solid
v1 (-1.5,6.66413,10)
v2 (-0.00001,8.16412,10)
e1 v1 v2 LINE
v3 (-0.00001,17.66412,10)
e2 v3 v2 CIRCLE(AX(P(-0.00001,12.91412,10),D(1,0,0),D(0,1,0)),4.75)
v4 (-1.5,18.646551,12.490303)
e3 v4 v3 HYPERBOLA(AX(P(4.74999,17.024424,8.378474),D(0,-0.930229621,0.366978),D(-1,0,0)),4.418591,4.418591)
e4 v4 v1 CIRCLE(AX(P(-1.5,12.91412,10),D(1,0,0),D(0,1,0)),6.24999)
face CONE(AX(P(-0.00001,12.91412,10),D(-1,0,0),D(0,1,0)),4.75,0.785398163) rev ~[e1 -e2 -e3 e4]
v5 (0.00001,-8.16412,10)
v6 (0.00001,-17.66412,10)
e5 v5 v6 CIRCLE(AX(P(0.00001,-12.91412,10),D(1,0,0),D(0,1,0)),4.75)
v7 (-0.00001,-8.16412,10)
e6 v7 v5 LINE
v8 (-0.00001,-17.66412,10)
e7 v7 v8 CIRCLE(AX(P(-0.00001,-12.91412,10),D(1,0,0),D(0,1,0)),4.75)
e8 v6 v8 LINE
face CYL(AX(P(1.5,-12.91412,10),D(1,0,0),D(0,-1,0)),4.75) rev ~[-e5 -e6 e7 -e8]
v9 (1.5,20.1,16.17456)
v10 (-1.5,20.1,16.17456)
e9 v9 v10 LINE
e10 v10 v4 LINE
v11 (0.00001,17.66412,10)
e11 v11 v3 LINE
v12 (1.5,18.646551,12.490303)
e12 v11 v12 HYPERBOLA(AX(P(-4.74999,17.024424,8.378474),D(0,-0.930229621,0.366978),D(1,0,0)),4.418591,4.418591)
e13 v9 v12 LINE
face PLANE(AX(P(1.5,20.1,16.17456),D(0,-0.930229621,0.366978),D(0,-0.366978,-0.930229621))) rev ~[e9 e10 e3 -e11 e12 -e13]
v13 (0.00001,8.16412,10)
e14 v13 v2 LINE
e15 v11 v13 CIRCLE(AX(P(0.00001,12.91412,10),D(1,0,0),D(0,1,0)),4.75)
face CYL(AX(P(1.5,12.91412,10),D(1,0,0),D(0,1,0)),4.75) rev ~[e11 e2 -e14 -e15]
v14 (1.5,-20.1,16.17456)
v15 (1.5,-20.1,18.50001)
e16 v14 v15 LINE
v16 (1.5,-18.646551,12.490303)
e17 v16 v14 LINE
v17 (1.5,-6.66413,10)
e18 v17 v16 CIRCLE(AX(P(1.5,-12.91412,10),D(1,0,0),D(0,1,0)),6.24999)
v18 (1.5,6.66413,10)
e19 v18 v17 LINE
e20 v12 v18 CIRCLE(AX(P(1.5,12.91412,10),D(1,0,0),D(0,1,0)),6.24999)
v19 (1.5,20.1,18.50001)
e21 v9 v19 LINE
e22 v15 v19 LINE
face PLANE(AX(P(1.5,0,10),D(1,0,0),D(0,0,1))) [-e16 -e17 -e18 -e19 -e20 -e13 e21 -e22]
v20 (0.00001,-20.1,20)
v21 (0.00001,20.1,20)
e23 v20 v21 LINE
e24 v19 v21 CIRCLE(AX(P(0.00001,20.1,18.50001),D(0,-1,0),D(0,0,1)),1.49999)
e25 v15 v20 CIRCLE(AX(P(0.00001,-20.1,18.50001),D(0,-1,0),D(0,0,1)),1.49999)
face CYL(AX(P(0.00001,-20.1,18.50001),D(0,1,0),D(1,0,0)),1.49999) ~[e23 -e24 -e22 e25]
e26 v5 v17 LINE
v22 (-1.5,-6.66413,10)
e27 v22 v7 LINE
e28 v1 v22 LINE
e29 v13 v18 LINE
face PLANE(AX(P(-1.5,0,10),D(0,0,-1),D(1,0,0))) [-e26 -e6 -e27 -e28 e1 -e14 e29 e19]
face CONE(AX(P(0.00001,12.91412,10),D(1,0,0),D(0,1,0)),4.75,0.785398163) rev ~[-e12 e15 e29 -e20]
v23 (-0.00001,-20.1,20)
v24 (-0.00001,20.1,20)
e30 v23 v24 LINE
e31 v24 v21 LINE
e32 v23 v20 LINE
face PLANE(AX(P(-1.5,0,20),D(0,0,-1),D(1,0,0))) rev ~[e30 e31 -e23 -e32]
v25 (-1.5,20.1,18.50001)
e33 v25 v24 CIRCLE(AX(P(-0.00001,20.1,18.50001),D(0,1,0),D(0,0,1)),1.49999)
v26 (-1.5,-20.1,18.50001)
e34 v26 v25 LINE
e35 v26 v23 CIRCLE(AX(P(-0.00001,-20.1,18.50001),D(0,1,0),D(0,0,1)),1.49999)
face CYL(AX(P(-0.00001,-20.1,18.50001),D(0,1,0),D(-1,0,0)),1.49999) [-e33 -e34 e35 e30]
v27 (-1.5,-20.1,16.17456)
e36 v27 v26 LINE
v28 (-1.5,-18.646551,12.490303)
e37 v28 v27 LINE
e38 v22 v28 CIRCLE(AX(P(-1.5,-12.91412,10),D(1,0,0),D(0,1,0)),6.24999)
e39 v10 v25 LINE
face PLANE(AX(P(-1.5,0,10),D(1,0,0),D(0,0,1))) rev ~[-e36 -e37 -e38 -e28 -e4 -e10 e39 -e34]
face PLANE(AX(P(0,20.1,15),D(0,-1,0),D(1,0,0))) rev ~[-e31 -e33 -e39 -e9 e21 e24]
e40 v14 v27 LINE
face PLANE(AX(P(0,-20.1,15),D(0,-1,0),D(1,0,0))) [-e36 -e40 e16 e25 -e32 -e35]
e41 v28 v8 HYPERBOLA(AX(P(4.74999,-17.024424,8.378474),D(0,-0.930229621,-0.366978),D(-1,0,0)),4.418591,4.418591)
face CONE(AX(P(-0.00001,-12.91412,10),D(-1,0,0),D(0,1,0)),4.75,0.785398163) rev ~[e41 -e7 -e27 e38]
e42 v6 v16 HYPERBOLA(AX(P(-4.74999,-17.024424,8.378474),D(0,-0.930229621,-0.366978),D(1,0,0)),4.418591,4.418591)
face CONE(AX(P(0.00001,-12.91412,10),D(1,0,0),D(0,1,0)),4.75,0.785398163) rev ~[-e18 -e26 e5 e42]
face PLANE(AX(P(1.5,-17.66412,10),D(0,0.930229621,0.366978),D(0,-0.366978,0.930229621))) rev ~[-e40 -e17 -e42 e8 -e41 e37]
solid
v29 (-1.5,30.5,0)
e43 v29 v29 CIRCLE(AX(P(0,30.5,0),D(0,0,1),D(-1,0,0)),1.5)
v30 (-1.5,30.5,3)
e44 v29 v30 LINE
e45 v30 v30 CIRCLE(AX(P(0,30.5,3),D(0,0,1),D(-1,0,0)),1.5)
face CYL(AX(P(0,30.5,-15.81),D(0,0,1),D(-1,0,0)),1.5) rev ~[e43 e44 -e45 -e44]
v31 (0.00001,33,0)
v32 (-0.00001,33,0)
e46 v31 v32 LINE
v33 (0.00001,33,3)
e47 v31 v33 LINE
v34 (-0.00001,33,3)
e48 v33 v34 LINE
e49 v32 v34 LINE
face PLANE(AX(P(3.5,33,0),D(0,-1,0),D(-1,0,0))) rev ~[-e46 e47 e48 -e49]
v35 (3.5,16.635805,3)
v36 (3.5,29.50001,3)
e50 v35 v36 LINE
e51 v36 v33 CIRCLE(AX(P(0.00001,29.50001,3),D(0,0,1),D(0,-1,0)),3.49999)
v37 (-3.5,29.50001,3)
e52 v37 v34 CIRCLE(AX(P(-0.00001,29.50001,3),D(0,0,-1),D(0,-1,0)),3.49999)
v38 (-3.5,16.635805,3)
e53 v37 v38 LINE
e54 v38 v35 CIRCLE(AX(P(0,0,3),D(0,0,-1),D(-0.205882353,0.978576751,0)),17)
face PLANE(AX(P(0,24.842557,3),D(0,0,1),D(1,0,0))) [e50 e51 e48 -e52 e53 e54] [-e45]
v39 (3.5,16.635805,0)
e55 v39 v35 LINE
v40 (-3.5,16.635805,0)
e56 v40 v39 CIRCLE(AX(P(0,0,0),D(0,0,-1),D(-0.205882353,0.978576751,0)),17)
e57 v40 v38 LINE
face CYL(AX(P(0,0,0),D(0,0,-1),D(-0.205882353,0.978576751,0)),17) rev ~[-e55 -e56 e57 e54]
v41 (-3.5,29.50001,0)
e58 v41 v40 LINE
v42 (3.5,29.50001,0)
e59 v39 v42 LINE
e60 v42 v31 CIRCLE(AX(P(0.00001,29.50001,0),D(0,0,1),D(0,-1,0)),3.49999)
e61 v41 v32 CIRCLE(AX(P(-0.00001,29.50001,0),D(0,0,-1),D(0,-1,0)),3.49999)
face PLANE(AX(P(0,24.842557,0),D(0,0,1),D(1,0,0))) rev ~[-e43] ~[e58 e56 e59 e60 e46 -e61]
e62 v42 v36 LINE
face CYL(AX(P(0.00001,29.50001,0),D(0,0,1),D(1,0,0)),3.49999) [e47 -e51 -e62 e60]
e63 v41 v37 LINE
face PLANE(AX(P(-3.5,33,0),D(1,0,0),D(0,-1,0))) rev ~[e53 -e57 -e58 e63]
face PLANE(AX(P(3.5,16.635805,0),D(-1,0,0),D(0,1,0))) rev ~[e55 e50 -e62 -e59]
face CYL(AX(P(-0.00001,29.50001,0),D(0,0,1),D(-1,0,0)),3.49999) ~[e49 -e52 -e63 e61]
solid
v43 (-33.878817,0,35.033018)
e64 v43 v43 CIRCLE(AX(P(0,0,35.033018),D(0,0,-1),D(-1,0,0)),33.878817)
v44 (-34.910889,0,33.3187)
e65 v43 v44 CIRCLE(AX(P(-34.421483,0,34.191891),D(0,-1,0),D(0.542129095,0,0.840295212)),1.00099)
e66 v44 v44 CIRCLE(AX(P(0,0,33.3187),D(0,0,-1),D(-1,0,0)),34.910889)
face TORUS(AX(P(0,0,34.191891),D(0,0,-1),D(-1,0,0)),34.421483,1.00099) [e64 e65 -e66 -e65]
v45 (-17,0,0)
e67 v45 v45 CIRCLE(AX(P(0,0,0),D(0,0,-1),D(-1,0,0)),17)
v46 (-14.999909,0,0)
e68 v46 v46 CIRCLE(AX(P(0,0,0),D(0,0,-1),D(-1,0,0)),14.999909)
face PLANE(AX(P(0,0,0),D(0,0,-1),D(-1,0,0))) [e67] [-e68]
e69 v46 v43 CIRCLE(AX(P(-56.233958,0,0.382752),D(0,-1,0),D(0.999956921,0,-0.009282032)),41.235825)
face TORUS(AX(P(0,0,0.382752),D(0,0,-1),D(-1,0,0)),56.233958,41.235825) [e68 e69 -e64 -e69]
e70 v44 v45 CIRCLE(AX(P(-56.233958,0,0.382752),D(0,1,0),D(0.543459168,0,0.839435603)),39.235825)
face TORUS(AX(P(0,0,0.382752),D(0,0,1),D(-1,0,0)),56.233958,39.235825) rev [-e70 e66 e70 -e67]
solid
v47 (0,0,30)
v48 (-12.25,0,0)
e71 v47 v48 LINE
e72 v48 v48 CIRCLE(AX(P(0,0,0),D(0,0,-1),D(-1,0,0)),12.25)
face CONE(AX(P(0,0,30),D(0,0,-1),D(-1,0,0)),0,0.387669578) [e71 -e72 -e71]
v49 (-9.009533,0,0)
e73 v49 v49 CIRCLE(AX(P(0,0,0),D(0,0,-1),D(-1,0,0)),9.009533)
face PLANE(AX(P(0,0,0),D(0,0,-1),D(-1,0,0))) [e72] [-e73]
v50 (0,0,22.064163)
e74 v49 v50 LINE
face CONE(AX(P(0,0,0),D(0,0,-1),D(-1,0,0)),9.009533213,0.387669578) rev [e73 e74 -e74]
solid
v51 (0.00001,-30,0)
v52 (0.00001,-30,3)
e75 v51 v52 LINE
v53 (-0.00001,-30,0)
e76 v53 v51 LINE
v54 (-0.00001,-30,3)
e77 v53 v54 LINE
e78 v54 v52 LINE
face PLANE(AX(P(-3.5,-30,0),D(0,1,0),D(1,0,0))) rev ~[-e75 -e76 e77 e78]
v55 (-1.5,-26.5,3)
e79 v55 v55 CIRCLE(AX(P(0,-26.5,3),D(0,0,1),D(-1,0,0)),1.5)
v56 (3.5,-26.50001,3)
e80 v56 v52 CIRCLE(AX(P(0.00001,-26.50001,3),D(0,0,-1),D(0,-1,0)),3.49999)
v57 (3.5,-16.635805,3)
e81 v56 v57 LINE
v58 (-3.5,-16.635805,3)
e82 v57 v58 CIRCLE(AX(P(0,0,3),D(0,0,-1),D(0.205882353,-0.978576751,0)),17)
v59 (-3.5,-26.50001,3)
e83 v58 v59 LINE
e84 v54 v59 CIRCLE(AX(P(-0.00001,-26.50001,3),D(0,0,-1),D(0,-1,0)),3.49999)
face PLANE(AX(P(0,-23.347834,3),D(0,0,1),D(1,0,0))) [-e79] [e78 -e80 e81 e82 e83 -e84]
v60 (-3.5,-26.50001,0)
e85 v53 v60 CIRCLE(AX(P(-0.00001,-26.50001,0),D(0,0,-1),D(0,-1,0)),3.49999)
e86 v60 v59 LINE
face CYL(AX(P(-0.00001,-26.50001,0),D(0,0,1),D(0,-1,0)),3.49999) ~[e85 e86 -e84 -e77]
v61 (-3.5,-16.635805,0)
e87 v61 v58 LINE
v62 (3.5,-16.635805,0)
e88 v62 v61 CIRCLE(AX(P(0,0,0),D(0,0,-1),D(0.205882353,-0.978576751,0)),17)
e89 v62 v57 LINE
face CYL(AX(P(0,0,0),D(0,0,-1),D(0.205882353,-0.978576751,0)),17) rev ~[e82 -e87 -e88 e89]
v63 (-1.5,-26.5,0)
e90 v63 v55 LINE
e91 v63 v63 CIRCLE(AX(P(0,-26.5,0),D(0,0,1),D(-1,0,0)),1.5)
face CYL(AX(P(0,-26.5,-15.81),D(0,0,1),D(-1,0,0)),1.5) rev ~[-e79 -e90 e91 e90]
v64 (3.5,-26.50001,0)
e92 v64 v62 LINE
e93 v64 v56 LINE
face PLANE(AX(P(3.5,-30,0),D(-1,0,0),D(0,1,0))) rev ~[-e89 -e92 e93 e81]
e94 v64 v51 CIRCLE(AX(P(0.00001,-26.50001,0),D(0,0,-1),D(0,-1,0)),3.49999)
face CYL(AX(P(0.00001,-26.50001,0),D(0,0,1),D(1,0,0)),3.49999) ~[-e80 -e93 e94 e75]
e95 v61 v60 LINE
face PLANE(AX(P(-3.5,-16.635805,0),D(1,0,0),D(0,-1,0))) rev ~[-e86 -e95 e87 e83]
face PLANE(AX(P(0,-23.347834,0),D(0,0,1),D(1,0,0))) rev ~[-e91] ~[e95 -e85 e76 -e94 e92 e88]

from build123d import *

# Parameters (mm, degrees)
F3_DEPTH   = 3
F4_D       = 3
F4_DEPTH   = 15.81
F4_TIP     = 0.9012909285
F4_2_D     = 3
F4_2_DEPTH = 15.81
F4_2_TIP   = 0.9012909285
F5_W       = 3
F5_H       = 10
F6_DEPTH   = 20.1
F7_R       = 1.49999
F9_DEPTH   = 25
F10_SIZE   = 1.49999
F11_R      = 3.49999
F11_2_R    = 3.49999


# Not quite as in the source:
# - a fillet or chamfer is up to 0.001 mm smaller than in the source, because OpenCascade refuses the exact size


with BuildPart() as f2:
    # F1 (on Front) → F2 (revolve)
    with BuildSketch(Plane.XZ):
        with BuildLine():
            ThreePointArc((-34.9108889941, 33.3187002586), (-21.6749891132, 18.9603630929), (-17, 0))
            Line((-17, 0), (-14.999909446, 0))
            ThreePointArc((-14.999909446, 0), (-19.9334849829, 19.9446773457), (-33.8788173136, 35.0330181488))
            ThreePointArc((-33.8788173136, 35.0330181488), (-35.2790555276, 34.7081760132), (-34.9108889941, 33.3187002586))
        make_face()
    revolve(axis=Axis((0, 0, 33.8666674644), (0, 0, -1)))


with BuildPart() as f2b:
    # F1 (on Front) → F2, piece 2 (revolve)
    with BuildSketch(Plane.XZ):
        Polygon((0, 30), (-12.25, 0), (-9.0095332126, 0), (0, 22.0641629697), align=None)
    revolve(axis=Axis((0, 0, 33.8666674644), (0, 0, -1)))


with BuildPart() as f3:
    # F0 (on Top) → F3 (new body)
    with BuildSketch(Plane.XY):
        with BuildLine():
            Line((3.5, -30), (3.5, -16.6358047596))
            ThreePointArc((3.5, -16.6358047596), (0, -17), (-3.5, -16.6358047596))
            Line((-3.5, -16.6358047596), (-3.5, -30))
            Line((-3.5, -30), (3.5, -30))
        make_face()
    extrude(amount=F3_DEPTH)

    # F4
    with Locations(Plane(origin=(0, 0, 0), x_dir=(1, 0, 0), z_dir=(0, 0, -1))):
        with Locations((0, -30.5), (0, 26.5)):
            Hole(F4_D / 2, depth=F4_DEPTH)
            with Locations((0, 0, -(F4_DEPTH + F4_TIP / 2))):  # 118° drill point
                Cone(0, F4_D / 2, F4_TIP, mode=Mode.SUBTRACT)

    # F11 (radius 3.5 in the source; OpenCascade refuses exactly that, so slightly less here)
    f11_edges = [f3.edges().sort_by_distance(p)[0] for p in [
        (-3.5, -30, 1.5),
        (3.5, -30, 1.5),
    ]]
    fillet(f11_edges, radius=F11_R)


with BuildPart() as f3b:
    # F0 (on Top) → F3, piece 2 (new body)
    with BuildSketch(Plane.XY):
        with BuildLine():
            ThreePointArc((-3.5, 16.6358047596), (0, 17), (3.5, 16.6358047596))
            Line((3.5, 16.6358047596), (3.5, 33))
            Line((3.5, 33), (-3.5, 33))
            Line((-3.5, 33), (-3.5, 16.6358047596))
        make_face()
    extrude(amount=F3_DEPTH)

    # F4#2
    with Locations(Plane(origin=(0, 0, 0), x_dir=(1, 0, 0), z_dir=(0, 0, -1))):
        with Locations((0, -30.5), (0, 26.5)):
            Hole(F4_2_D / 2, depth=F4_2_DEPTH)
            with Locations((0, 0, -(F4_2_DEPTH + F4_2_TIP / 2))):  # 118° drill point
                Cone(0, F4_2_D / 2, F4_2_TIP, mode=Mode.SUBTRACT)

    # F11#2 (radius 3.5 in the source; OpenCascade refuses exactly that, so slightly less here)
    f11_2_edges = [f3b.edges().sort_by_distance(p)[0] for p in [
        (-3.5, 33, 1.5),
        (3.5, 33, 1.5),
    ]]
    fillet(f11_2_edges, radius=F11_2_R)


with BuildPart() as f6:
    # F5 (on Front) → F6 (new body, symmetric)
    with BuildSketch(Plane.XZ):
        with Locations((0, 15)):
            Rectangle(F5_W, F5_H)
    extrude(amount=F6_DEPTH, both=True)

    # F7 (radius 1.5 in the source; OpenCascade refuses exactly that, so slightly less here)
    f7_edges = [f6.edges().sort_by_distance(p)[0] for p in [
        (1.5, 0, 20),
        (-1.5, 0, 20),
    ]]
    fillet(f7_edges, radius=F7_R)

    # F8 (on face) → F9 (cut)
    with BuildSketch(Plane.YZ.offset(1.5)):
        with BuildLine():
            Line((-17.6641202196, 10), (-8.1641202196, 10))
            ThreePointArc((-8.1641202196, 10), (-12.9141202196, 14.75), (-17.6641202196, 10))
        make_face()
        with BuildLine():
            ThreePointArc((-17.6641202196, 10), (-12.9141202196, 5.25), (-8.1641202196, 10))
            Line((-8.1641202196, 10), (-17.6641202196, 10))
        make_face()
        Polygon((-20.1, 10), (-17.6641202196, 10), (-20.1, 16.1745595807), align=None)
        with BuildLine():
            ThreePointArc((17.6641202196, 10), (12.9141202196, 14.75), (8.1641202196, 10))
            Line((8.1641202196, 10), (17.6641202196, 10))
        make_face()
        Polygon((20.1, 16.1745595807), (17.6641202196, 10), (20.1, 10), align=None)
    extrude(amount=-F9_DEPTH, mode=Mode.SUBTRACT)

    # F10 (size 1.5 in the source; OpenCascade refuses exactly that, so slightly less here)
    f10_edges = [f6.edges().sort_by_distance(p)[0] for p in [
        (1.5, -12.91412, 14.75),
        (1.5, 12.91412, 14.75),
        (-1.5, 12.91412, 14.75),
        (-1.5, -12.91412, 14.75),
    ]]
    chamfer(f10_edges, length=F10_SIZE)


solid = Compound([f2.part, f2b.part, f3.part, f3b.part, f6.part])
